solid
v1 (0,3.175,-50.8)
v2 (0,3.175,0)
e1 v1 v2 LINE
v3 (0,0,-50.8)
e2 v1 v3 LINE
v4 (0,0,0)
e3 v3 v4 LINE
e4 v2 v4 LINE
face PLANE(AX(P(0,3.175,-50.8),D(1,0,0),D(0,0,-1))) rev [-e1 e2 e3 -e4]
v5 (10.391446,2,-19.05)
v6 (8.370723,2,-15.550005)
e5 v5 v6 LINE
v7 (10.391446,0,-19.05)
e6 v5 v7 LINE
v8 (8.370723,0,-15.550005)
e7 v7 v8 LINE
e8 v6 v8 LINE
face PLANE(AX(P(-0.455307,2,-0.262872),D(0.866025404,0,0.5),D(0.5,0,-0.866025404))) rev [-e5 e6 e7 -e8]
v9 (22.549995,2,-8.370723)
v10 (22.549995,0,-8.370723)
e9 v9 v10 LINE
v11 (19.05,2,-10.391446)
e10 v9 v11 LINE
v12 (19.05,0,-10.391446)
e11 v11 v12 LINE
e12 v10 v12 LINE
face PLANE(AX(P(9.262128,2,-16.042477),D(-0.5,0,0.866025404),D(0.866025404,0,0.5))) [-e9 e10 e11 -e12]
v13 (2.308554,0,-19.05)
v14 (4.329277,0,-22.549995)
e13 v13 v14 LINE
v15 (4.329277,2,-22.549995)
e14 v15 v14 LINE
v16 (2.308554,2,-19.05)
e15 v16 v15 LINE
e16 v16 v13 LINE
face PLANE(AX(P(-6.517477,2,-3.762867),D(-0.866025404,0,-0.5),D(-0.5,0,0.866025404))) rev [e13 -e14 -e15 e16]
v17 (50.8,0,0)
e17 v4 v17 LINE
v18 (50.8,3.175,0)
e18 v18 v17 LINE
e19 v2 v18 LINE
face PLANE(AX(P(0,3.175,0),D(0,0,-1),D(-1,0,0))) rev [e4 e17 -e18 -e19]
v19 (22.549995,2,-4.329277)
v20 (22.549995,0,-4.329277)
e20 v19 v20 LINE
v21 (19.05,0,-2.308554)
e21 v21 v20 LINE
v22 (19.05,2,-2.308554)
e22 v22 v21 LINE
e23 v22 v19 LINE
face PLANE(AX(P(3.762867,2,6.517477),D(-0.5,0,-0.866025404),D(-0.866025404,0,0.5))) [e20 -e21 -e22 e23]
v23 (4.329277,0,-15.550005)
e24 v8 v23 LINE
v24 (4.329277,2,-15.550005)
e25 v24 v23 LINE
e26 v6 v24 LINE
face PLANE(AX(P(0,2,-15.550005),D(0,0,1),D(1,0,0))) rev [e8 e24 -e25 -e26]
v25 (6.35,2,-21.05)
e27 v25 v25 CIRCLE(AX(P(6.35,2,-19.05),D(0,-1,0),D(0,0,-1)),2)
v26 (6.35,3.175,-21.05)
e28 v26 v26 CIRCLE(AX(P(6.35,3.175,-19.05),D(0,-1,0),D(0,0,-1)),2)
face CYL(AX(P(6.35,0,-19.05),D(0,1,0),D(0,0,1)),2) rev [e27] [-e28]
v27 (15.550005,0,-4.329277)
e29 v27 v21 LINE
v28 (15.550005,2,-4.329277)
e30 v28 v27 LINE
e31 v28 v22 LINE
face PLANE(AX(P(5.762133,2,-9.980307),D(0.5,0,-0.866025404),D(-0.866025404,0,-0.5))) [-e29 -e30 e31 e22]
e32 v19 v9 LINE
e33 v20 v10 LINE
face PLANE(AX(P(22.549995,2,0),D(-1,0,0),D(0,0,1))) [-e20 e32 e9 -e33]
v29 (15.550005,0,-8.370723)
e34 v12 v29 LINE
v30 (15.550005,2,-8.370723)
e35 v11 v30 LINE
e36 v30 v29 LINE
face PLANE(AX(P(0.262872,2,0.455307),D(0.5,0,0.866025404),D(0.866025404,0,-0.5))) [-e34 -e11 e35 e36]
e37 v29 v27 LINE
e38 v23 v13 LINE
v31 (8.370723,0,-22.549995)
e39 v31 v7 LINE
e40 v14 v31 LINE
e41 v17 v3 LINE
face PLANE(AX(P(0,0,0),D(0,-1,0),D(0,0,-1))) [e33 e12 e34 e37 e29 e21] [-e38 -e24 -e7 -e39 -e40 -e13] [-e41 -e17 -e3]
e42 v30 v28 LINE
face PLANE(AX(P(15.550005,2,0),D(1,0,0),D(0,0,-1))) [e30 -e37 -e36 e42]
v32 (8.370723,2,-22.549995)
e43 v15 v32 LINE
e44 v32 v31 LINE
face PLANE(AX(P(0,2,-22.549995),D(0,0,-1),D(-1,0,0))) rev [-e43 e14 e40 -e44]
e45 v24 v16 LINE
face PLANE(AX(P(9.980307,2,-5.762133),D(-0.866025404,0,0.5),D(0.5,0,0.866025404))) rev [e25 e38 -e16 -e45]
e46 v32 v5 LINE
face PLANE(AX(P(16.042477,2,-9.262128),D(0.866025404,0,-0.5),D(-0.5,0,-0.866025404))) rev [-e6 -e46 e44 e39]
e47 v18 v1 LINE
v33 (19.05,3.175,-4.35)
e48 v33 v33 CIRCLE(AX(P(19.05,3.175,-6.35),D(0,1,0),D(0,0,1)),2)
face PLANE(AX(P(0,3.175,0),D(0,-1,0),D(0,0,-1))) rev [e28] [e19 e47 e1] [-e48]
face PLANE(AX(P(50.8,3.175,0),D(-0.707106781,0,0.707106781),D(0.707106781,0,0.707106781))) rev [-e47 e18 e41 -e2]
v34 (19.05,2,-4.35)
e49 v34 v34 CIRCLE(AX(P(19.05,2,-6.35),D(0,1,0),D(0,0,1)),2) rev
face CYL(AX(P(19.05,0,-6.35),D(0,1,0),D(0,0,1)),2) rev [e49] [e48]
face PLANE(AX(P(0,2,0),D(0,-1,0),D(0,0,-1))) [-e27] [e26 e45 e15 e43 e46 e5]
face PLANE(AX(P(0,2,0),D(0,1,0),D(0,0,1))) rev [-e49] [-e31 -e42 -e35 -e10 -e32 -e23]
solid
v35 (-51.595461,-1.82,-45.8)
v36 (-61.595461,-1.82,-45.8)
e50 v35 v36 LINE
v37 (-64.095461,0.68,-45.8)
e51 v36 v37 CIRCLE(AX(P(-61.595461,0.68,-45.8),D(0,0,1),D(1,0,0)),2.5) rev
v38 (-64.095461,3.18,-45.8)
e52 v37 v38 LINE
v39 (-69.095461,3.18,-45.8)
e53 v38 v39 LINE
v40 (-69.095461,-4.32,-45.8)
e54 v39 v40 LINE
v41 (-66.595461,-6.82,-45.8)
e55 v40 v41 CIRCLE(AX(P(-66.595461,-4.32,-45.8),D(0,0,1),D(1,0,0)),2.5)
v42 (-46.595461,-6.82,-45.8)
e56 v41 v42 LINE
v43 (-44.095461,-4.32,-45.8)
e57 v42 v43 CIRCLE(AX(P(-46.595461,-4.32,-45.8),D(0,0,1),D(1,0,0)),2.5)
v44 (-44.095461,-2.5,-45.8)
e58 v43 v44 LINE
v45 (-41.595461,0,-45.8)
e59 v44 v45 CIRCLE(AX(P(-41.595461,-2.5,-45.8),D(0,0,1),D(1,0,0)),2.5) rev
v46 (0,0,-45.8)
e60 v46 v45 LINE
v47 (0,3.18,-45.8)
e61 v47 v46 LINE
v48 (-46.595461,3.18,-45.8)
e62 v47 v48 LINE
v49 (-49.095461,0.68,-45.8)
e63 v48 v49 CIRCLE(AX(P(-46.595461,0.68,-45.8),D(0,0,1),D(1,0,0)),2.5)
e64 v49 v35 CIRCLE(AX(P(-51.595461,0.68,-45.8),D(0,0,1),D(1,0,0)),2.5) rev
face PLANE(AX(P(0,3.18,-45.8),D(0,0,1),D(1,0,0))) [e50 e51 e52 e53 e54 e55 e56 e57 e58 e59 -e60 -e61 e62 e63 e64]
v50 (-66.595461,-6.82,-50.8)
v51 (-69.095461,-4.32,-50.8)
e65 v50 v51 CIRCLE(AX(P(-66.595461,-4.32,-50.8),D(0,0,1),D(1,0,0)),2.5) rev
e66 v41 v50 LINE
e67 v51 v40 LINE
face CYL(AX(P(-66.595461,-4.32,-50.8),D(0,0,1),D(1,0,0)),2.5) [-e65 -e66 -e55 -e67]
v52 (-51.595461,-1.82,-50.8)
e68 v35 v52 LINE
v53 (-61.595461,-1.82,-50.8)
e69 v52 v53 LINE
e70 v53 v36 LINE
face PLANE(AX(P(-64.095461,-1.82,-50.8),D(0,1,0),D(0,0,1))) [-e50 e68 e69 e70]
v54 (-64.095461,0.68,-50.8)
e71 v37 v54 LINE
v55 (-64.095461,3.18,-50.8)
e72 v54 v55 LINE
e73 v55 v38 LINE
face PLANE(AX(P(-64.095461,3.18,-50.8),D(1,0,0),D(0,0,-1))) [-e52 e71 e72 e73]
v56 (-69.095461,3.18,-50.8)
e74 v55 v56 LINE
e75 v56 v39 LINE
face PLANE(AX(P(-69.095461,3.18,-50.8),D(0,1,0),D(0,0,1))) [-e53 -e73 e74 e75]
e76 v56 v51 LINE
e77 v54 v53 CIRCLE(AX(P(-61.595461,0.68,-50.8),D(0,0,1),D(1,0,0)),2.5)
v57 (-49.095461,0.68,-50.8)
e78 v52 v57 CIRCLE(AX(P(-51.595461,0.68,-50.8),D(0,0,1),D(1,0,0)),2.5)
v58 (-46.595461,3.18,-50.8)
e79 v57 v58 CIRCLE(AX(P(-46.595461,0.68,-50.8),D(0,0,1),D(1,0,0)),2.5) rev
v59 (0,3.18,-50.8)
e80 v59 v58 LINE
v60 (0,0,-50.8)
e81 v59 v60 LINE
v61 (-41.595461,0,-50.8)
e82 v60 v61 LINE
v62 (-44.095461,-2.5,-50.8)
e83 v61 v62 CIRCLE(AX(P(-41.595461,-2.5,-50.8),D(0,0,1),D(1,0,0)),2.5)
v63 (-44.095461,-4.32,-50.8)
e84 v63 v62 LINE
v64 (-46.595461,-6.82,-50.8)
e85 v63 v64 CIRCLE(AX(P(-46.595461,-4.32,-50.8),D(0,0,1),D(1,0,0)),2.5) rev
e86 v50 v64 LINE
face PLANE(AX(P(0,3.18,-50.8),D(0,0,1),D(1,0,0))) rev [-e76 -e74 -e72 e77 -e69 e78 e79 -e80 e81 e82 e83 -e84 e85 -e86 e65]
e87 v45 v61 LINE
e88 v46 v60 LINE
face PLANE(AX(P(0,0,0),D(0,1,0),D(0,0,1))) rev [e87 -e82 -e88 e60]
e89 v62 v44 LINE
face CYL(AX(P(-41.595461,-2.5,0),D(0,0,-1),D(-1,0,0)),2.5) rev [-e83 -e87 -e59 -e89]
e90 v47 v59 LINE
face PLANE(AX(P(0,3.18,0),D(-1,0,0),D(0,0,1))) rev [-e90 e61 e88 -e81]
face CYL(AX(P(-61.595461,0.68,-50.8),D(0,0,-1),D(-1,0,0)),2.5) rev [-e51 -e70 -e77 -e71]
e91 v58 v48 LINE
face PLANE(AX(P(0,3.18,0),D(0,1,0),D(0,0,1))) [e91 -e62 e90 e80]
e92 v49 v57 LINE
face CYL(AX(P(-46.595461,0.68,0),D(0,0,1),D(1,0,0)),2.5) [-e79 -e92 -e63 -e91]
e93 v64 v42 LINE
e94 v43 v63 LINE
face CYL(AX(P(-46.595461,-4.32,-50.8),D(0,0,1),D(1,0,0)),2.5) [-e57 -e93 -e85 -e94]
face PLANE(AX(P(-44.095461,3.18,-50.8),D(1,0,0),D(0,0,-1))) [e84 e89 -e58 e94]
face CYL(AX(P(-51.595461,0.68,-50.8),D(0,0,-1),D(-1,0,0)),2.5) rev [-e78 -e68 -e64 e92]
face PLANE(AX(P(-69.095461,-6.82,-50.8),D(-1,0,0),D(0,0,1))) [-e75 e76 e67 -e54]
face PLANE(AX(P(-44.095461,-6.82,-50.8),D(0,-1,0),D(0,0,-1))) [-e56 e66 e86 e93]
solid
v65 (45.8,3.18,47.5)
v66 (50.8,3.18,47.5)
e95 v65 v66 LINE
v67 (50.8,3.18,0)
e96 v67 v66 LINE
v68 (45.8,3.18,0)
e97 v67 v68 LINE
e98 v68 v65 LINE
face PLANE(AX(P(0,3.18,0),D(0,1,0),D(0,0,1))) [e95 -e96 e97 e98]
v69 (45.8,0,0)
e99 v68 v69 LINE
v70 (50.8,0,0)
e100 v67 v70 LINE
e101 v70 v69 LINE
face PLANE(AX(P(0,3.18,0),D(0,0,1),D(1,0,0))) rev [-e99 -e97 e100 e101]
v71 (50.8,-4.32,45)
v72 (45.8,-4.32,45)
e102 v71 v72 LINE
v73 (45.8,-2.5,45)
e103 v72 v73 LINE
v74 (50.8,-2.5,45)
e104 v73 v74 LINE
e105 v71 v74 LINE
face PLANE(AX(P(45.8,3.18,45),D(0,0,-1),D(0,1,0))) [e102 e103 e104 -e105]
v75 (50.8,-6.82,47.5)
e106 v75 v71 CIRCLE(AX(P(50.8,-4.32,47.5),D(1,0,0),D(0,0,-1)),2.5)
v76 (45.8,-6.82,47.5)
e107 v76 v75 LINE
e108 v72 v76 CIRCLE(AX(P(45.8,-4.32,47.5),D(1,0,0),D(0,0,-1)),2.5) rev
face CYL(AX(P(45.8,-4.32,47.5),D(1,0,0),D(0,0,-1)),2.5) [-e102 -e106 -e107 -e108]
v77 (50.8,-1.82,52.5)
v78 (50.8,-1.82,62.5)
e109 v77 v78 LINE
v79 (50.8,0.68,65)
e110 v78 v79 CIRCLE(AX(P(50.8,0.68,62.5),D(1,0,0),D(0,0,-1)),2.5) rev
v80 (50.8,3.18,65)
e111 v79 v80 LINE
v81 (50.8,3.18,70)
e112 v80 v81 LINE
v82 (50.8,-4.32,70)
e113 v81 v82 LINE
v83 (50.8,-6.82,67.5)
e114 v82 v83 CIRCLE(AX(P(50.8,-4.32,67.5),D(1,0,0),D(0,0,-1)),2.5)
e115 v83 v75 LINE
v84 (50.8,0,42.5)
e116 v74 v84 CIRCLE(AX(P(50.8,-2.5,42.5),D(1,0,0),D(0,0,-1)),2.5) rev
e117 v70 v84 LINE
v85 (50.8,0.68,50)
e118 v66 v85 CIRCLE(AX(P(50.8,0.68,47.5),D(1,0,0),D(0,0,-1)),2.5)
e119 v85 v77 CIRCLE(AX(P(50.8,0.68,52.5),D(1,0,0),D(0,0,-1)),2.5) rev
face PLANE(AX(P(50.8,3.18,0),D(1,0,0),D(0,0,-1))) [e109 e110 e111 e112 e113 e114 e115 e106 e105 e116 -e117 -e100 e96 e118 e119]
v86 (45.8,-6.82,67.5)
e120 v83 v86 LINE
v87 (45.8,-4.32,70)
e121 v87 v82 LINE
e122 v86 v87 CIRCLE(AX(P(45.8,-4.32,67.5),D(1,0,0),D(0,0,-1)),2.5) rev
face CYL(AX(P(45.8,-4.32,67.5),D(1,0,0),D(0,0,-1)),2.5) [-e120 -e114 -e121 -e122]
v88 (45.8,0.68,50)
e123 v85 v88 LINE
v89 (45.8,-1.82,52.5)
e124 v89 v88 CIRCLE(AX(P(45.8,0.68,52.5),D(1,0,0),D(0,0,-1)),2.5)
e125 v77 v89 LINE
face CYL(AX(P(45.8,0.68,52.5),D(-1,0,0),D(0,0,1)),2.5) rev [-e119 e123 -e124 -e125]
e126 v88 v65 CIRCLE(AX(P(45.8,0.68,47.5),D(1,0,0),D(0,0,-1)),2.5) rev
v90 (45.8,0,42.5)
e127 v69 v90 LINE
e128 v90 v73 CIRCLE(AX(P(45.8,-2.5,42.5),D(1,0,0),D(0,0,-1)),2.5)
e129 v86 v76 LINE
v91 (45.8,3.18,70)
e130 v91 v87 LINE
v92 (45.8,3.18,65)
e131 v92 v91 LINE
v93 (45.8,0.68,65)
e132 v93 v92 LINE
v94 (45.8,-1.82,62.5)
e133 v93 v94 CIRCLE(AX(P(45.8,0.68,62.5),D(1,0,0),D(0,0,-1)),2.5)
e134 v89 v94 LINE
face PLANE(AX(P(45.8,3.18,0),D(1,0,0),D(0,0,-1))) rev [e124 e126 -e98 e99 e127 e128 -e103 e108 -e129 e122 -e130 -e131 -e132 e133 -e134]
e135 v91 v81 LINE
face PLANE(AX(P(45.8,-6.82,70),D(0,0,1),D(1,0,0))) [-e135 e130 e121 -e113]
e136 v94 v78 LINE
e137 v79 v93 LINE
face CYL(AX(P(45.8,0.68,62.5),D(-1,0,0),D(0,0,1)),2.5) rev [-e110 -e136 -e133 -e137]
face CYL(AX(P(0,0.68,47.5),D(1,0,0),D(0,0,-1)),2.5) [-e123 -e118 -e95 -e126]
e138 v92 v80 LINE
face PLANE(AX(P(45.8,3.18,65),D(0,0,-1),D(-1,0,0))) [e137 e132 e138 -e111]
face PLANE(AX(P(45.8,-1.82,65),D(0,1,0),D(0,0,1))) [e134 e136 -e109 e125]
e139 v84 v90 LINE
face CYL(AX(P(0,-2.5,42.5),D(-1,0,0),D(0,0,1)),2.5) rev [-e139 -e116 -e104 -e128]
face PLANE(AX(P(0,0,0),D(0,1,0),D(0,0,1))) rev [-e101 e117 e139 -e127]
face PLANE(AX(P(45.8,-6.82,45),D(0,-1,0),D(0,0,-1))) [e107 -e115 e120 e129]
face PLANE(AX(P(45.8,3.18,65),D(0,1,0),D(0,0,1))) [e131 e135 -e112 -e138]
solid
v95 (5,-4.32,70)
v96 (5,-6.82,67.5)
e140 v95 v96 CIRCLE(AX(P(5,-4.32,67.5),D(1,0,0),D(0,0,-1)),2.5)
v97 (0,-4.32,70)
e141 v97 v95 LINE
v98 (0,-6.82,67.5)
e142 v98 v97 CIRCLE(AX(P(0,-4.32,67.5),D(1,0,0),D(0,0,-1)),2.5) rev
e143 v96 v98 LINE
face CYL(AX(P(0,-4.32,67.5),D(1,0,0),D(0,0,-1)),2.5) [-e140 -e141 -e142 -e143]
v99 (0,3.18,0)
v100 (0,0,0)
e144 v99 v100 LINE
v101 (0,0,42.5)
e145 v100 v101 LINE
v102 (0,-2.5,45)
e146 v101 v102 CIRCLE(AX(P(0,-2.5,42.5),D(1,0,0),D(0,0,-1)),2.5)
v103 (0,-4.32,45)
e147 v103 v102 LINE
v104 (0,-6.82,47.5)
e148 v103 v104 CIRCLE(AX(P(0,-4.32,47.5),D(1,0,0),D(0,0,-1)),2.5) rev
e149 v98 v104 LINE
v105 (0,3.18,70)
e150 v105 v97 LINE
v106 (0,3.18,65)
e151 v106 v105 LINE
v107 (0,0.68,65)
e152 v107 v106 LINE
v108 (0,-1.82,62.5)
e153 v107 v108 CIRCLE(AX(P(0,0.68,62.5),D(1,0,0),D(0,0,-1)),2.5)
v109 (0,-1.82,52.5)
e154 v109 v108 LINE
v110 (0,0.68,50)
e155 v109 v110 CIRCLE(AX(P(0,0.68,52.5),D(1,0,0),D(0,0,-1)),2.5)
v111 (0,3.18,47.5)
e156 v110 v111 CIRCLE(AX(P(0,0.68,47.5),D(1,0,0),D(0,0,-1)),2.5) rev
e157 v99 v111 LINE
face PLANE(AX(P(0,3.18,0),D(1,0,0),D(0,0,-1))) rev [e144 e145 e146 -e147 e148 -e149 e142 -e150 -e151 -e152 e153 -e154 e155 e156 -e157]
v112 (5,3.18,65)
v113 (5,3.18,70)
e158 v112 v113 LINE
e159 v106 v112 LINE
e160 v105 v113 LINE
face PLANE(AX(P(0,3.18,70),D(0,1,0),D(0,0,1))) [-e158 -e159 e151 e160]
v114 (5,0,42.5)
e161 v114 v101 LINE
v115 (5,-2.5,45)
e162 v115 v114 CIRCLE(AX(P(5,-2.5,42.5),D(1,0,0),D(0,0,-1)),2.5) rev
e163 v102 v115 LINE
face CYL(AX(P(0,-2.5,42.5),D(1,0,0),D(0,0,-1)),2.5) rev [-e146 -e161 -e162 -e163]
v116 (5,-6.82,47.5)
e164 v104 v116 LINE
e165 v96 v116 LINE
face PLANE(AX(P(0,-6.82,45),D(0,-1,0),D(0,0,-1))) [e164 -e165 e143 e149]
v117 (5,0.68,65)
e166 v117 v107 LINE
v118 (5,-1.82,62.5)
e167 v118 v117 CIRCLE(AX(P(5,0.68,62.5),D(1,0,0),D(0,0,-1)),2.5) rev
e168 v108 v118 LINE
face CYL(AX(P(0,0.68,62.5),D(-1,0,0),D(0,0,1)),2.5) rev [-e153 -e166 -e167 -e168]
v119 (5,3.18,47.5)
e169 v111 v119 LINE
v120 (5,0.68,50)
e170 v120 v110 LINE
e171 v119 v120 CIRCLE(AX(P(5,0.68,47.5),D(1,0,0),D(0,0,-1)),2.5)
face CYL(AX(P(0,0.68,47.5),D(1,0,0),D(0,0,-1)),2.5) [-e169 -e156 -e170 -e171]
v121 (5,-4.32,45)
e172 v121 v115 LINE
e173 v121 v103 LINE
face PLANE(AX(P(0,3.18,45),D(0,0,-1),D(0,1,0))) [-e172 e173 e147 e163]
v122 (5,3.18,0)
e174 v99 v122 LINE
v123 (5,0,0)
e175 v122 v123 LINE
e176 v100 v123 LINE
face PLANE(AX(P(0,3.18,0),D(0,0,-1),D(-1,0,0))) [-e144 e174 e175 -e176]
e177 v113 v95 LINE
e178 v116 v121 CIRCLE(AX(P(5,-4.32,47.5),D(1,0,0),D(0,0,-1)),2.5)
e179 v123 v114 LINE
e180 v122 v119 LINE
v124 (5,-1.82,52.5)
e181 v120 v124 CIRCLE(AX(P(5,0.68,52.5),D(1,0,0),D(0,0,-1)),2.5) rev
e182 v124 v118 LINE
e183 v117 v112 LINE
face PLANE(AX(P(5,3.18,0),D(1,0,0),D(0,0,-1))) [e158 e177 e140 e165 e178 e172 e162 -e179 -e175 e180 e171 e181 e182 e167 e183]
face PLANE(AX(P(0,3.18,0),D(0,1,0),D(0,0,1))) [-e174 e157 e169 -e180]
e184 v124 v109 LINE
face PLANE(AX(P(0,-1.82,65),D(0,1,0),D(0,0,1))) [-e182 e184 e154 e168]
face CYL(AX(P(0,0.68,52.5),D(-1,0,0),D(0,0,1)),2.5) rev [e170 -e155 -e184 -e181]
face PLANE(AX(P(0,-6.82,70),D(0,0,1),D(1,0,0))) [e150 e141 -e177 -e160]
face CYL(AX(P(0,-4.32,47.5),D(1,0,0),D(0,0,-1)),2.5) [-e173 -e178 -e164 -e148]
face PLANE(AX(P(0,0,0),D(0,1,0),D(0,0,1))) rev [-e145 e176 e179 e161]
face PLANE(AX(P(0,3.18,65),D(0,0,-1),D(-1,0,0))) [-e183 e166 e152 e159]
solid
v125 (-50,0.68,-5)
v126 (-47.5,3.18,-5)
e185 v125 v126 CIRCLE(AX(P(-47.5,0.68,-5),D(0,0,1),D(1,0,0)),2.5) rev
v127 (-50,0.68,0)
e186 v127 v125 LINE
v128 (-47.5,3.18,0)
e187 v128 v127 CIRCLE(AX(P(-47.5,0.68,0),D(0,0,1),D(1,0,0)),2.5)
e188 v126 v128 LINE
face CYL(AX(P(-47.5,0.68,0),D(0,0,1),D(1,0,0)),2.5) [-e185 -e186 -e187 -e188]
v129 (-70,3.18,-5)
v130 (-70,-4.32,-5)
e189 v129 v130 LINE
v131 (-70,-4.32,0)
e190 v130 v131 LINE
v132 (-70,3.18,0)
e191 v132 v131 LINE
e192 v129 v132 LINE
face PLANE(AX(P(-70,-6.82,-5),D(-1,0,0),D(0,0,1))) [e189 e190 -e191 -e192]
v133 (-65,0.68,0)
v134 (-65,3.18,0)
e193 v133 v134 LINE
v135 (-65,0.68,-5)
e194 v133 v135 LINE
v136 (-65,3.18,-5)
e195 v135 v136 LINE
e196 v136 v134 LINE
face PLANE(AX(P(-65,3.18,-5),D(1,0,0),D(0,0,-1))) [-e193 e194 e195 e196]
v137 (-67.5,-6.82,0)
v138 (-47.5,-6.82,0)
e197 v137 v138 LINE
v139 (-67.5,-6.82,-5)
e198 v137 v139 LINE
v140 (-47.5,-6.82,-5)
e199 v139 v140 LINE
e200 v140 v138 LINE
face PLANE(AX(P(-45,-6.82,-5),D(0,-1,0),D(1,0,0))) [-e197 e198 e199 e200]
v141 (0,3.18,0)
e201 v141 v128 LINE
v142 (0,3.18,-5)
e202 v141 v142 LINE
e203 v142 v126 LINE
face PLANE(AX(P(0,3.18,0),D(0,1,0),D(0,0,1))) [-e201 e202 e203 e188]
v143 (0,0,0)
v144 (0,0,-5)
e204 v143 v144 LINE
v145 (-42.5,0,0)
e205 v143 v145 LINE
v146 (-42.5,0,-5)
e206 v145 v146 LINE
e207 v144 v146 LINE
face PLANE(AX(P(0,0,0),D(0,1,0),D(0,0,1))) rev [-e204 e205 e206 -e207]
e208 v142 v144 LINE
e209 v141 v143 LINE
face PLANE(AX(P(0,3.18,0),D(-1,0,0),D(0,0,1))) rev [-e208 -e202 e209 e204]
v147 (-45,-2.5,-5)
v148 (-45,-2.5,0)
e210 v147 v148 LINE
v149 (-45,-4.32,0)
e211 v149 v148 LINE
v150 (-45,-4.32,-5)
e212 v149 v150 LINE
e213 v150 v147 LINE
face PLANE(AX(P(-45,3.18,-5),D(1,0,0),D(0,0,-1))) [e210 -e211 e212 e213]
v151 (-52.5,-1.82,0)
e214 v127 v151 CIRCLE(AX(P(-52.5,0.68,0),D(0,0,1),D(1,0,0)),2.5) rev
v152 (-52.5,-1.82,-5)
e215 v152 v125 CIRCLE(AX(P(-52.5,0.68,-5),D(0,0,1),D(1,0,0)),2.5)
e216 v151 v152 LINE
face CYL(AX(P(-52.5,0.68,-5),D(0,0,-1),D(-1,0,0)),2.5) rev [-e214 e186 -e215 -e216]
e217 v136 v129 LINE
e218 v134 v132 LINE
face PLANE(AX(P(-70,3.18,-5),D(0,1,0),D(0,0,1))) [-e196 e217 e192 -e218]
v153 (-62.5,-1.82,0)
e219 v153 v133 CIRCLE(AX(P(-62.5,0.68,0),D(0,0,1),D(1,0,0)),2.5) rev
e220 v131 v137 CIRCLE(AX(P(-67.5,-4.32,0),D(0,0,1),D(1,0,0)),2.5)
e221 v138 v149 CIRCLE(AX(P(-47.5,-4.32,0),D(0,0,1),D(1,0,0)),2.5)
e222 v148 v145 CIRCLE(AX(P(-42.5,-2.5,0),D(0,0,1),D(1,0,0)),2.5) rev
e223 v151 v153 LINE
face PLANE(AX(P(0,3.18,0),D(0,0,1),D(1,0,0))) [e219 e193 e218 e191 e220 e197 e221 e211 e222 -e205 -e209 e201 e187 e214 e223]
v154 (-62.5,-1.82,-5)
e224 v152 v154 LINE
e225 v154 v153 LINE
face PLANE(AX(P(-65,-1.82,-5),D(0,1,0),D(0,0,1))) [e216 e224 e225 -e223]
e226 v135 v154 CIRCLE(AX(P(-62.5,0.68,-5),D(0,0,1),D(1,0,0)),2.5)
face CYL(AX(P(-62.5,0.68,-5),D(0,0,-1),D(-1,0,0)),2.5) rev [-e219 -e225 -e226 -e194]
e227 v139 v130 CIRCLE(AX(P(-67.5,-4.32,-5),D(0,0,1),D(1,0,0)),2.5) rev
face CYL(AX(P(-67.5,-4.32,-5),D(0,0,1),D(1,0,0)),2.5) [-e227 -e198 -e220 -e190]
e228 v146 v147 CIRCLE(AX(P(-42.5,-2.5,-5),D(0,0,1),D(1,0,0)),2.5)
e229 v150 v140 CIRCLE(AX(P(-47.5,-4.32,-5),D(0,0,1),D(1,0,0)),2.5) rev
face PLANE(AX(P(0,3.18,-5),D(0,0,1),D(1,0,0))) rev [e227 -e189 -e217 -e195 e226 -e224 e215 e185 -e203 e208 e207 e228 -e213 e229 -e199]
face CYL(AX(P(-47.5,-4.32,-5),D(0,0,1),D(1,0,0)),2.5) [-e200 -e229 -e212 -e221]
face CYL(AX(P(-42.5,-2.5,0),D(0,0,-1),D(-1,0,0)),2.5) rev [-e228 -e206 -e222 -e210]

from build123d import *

# Parameters (mm, degrees)
BOSS_EXTRUDE1_DEPTH   = 3.175
SKETCH2_R             = 2
CUT_EXTRUDE1_DEPTH    = 72.912172996
CUT_EXTRUDE2_START    = -3.175
CUT_EXTRUDE2_DEPTH    = 2
SKETCH5_W             = 5
SKETCH5_H             = 45
BOSS_EXTRUDE6_DEPTH   = 3.18
BOSS_EXTRUDE6_2_DEPTH = 3.18
SKETCH5_W_2           = 45
SKETCH5_H_2           = 5
BOSS_EXTRUDE6_3_DEPTH = 3.18
SKETCH5_W_3           = 44.095460655
BOSS_EXTRUDE6_4_DEPTH = 3.18
BOSS_EXTRUDE7_DEPTH   = 5
FILLET1_START         = 45
FILLET1_DEPTH         = 7
FILLET1_START_2       = 45.8
FILLET1_2_DEPTH       = 5
BOSS_EXTRUDE8_DEPTH   = 5
FILLET2_START         = -1
FILLET2_DEPTH         = 7
FILLET2_2_DEPTH       = 5
BOSS_EXTRUDE9_DEPTH   = 5
FILLET3_START         = -6
FILLET3_DEPTH         = 7
FILLET3_START_2       = -5
FILLET3_2_DEPTH       = 5
BOSS_EXTRUDE10_DEPTH  = 5
FILLET4_START         = -52
FILLET4_DEPTH         = 7
FILLET4_START_2       = -50.8
FILLET4_2_DEPTH       = 5


with BuildPart() as part:
    # Sketch1 → Boss-Extrude1 (new body)
    with BuildSketch(Plane(origin=(0, 0, 0), x_dir=(1, 0, 0), z_dir=(0, 1, 0))):
        Polygon((0, 0), (50.8, 0), (0, 50.8), align=None)
    extrude(amount=BOSS_EXTRUDE1_DEPTH)

    # Sketch2 → Cut-Extrude1 (cut, through all)
    with BuildSketch(Plane(origin=(0, 3.175, 0), x_dir=(1, 0, 0), z_dir=(0, 1, 0))):
        with Locations(Location((19.05, 6.35, 0), (0, 0, 270))):
            Circle(SKETCH2_R)
        with Locations(Location((6.35, 19.05, 0), (0, 0, 90))):
            Circle(SKETCH2_R)
    extrude(amount=-CUT_EXTRUDE1_DEPTH, mode=Mode.SUBTRACT)

    # Sketch3 → Cut-Extrude2 (cut)
    with BuildSketch(Plane(origin=(0, 3.175, 0), x_dir=(1, 0, 0), z_dir=(0, 1, 0)).offset(CUT_EXTRUDE2_START)):
        Polygon((8.370723055, 15.550005), (10.391446111, 19.05), (8.370723055, 22.549995), (4.329276945, 22.549995), (2.308553889, 19.05), (4.329276945, 15.550005), align=None)
        Polygon((22.549995, 4.329276945), (19.05, 2.308553889), (15.550005, 4.329276945), (15.550005, 8.370723055), (19.05, 10.391446111), (22.549995, 8.370723055), align=None)
    extrude(amount=CUT_EXTRUDE2_DEPTH, mode=Mode.SUBTRACT)


with BuildPart() as body_2:
    # Sketch5 → Boss-Extrude6 (new body)
    with BuildSketch(Plane(origin=(0, 0, 0), x_dir=(1, 0, 0), z_dir=(0, 1, 0))):
        with Locations((48.3, -22.5)):
            Rectangle(SKETCH5_W, SKETCH5_H)
    extrude(amount=BOSS_EXTRUDE6_DEPTH)

    # Sketch7 → Boss-Extrude7 (add)
    with BuildSketch(Plane(origin=(50.8, 0, 0), x_dir=(0, 0, -1), z_dir=(1, 0, 0))):
        Polygon((-45, 3.18), (-50, 3.18), (-50, -1.82), (-65, -1.82), (-65, 3.18), (-70, 3.18), (-70, -6.82), (-45, -6.82), align=None)
    extrude(amount=-BOSS_EXTRUDE7_DEPTH)

    # Fillet1: read off the stored shape, not the designer's step
    # Fillet1 outline → Fillet1 (cut)
    with BuildSketch(Plane.YZ.offset(FILLET1_START)):
        with BuildLine():
            ThreePointArc((-4.32, 45), (-6.087766953, 45.732233047), (-6.82, 47.5))
            Line((-6.82, 47.5), (-6.82, 45))
            Line((-6.82, 45), (-4.32, 45))
        make_face()
        with BuildLine():
            Line((3.18, 50), (0.68, 50))
            ThreePointArc((0.68, 50), (2.447766953, 49.267766953), (3.18, 47.5))
            Line((3.18, 47.5), (3.18, 50))
        make_face()
        with BuildLine():
            ThreePointArc((-6.82, 67.5), (-6.087766953, 69.267766953), (-4.32, 70))
            Line((-4.32, 70), (-6.82, 70))
            Line((-6.82, 70), (-6.82, 67.5))
        make_face()
    extrude(amount=FILLET1_DEPTH, mode=Mode.SUBTRACT)

    # Fillet1 2 outline → Fillet1 2 (add)
    with BuildSketch(Plane.YZ.offset(FILLET1_START_2)):
        with BuildLine():
            Line((0, 45), (-2.5, 45))
            ThreePointArc((-2.5, 45), (-0.732233047, 44.267766953), (0, 42.5))
            Line((0, 42.5), (0, 45))
        make_face()
        with BuildLine():
            ThreePointArc((0.68, 50), (-1.087766953, 50.732233047), (-1.82, 52.5))
            Line((-1.82, 52.5), (-1.82, 50))
            Line((-1.82, 50), (0.68, 50))
        make_face()
        with BuildLine():
            ThreePointArc((-1.82, 62.5), (-1.087766953, 64.267766953), (0.68, 65))
            Line((0.68, 65), (-1.82, 65))
            Line((-1.82, 65), (-1.82, 62.5))
        make_face()
    extrude(amount=FILLET1_2_DEPTH)


with BuildPart() as body_3:
    # Sketch5 → Boss-Extrude6 2 (new body)
    with BuildSketch(Plane(origin=(0, 0, 0), x_dir=(1, 0, 0), z_dir=(0, 1, 0))):
        with Locations((2.5, -22.5)):
            Rectangle(SKETCH5_W, SKETCH5_H)
    extrude(amount=BOSS_EXTRUDE6_2_DEPTH)

    # Sketch9 → Boss-Extrude8 (add)
    with BuildSketch(Plane(origin=(5, 0, 0), x_dir=(0, 0, -1), z_dir=(1, 0, 0))):
        Polygon((-45, 3.18), (-45, -6.82), (-70, -6.82), (-70, 3.18), (-65, 3.18), (-65, -1.82), (-50, -1.82), (-50, 3.18), align=None)
    extrude(amount=-BOSS_EXTRUDE8_DEPTH)

    # Fillet2: read off the stored shape, not the designer's step
    # Fillet2 outline → Fillet2 (cut)
    with BuildSketch(Plane.YZ.offset(FILLET2_START)):
        with BuildLine():
            Line((3.18, 50), (0.68, 50))
            ThreePointArc((0.68, 50), (2.447766953, 49.267766953), (3.18, 47.5))
            Line((3.18, 47.5), (3.18, 50))
        make_face()
        with BuildLine():
            ThreePointArc((-4.32, 45), (-6.087766953, 45.732233047), (-6.82, 47.5))
            Line((-6.82, 47.5), (-6.82, 45))
            Line((-6.82, 45), (-4.32, 45))
        make_face()
        with BuildLine():
            ThreePointArc((-6.82, 67.5), (-6.087766953, 69.267766953), (-4.32, 70))
            Line((-4.32, 70), (-6.82, 70))
            Line((-6.82, 70), (-6.82, 67.5))
        make_face()
    extrude(amount=FILLET2_DEPTH, mode=Mode.SUBTRACT)

    # Fillet2 2 outline → Fillet2 2 (add)
    with BuildSketch(Plane.YZ):
        with BuildLine():
            Line((-1.82, 65), (-1.82, 62.5))
            ThreePointArc((-1.82, 62.5), (-1.087766953, 64.267766953), (0.68, 65))
            Line((0.68, 65), (-1.82, 65))
        make_face()
        with BuildLine():
            ThreePointArc((0.68, 50), (-1.087766953, 50.732233047), (-1.82, 52.5))
            Line((-1.82, 52.5), (-1.82, 50))
            Line((-1.82, 50), (0.68, 50))
        make_face()
        with BuildLine():
            Line((0, 45), (-2.5, 45))
            ThreePointArc((-2.5, 45), (-0.732233047, 44.267766953), (0, 42.5))
            Line((0, 42.5), (0, 45))
        make_face()
    extrude(amount=FILLET2_2_DEPTH)


with BuildPart() as body_4:
    # Sketch5 → Boss-Extrude6 3 (new body)
    with BuildSketch(Plane(origin=(0, 0, 0), x_dir=(1, 0, 0), z_dir=(0, 1, 0))):
        with Locations((-22.5, 2.5)):
            Rectangle(SKETCH5_W_2, SKETCH5_H_2)
    extrude(amount=BOSS_EXTRUDE6_3_DEPTH)

    # Sketch10 → Boss-Extrude9 (add)
    with BuildSketch(Plane.XY):
        Polygon((-45, 3.18), (-45, -6.82), (-70, -6.82), (-70, 3.18), (-65, 3.18), (-65, -1.82), (-50, -1.82), (-50, 3.18), align=None)
    extrude(amount=-BOSS_EXTRUDE9_DEPTH)

    # Fillet3: read off the stored shape, not the designer's step
    # Fillet3 outline → Fillet3 (cut)
    with BuildSketch(Plane.XY.offset(FILLET3_START)):
        with BuildLine():
            Line((-50, 3.18), (-50, 0.68))
            ThreePointArc((-50, 0.68), (-49.267766953, 2.447766953), (-47.5, 3.18))
            Line((-47.5, 3.18), (-50, 3.18))
        make_face()
        with BuildLine():
            ThreePointArc((-45, -4.32), (-45.732233047, -6.087766953), (-47.5, -6.82))
            Line((-47.5, -6.82), (-45, -6.82))
            Line((-45, -6.82), (-45, -4.32))
        make_face()
        with BuildLine():
            ThreePointArc((-67.5, -6.82), (-69.267766953, -6.087766953), (-70, -4.32))
            Line((-70, -4.32), (-70, -6.82))
            Line((-70, -6.82), (-67.5, -6.82))
        make_face()
    extrude(amount=FILLET3_DEPTH, mode=Mode.SUBTRACT)

    # Fillet3 2 outline → Fillet3 2 (add)
    with BuildSketch(Plane.XY.offset(FILLET3_START_2)):
        with BuildLine():
            Line((-65, -1.82), (-62.5, -1.82))
            ThreePointArc((-62.5, -1.82), (-64.267766953, -1.087766953), (-65, 0.68))
            Line((-65, 0.68), (-65, -1.82))
        make_face()
        with BuildLine():
            ThreePointArc((-50, 0.68), (-50.732233047, -1.087766953), (-52.5, -1.82))
            Line((-52.5, -1.82), (-50, -1.82))
            Line((-50, -1.82), (-50, 0.68))
        make_face()
        with BuildLine():
            Line((-45, 0), (-45, -2.5))
            ThreePointArc((-45, -2.5), (-44.267766953, -0.732233047), (-42.5, 0))
            Line((-42.5, 0), (-45, 0))
        make_face()
    extrude(amount=FILLET3_2_DEPTH)


with BuildPart() as body_5:
    # Sketch5 → Boss-Extrude6 4 (new body)
    with BuildSketch(Plane(origin=(0, 0, 0), x_dir=(1, 0, 0), z_dir=(0, 1, 0))):
        with Locations((-22.047730328, 48.3)):
            Rectangle(SKETCH5_W_3, SKETCH5_H_2)
    extrude(amount=BOSS_EXTRUDE6_4_DEPTH)

    # Sketch12 → Boss-Extrude10 (add)
    with BuildSketch(Plane.XY.offset(-45.8)):
        Polygon((-44.095460655, 3.18), (-44.095460655, -6.82), (-69.095460655, -6.82), (-69.095460655, 3.18), (-64.095460655, 3.18), (-64.095460655, -1.82), (-49.095460655, -1.82), (-49.095460655, 3.18), align=None)
    extrude(amount=-BOSS_EXTRUDE10_DEPTH)

    # Fillet4: read off the stored shape, not the designer's step
    # Fillet4 outline → Fillet4 (cut)
    with BuildSketch(Plane.XY.offset(FILLET4_START)):
        with BuildLine():
            Line((-49.095460655, 3.18), (-49.095460655, 0.68))
            ThreePointArc((-49.095460655, 0.68), (-48.363227608, 2.447766953), (-46.595460655, 3.18))
            Line((-46.595460655, 3.18), (-49.095460655, 3.18))
        make_face()
        with BuildLine():
            ThreePointArc((-44.095460655, -4.32), (-44.827693702, -6.087766953), (-46.595460655, -6.82))
            Line((-46.595460655, -6.82), (-44.095460655, -6.82))
            Line((-44.095460655, -6.82), (-44.095460655, -4.32))
        make_face()
        with BuildLine():
            ThreePointArc((-66.595460655, -6.82), (-68.363227608, -6.087766953), (-69.095460655, -4.32))
            Line((-69.095460655, -4.32), (-69.095460655, -6.82))
            Line((-69.095460655, -6.82), (-66.595460655, -6.82))
        make_face()
    extrude(amount=FILLET4_DEPTH, mode=Mode.SUBTRACT)

    # Fillet4 2 outline → Fillet4 2 (add)
    with BuildSketch(Plane.XY.offset(FILLET4_START_2)):
        with BuildLine():
            Line((-64.095460655, -1.82), (-61.595460655, -1.82))
            ThreePointArc((-61.595460655, -1.82), (-63.363227608, -1.087766953), (-64.095460655, 0.68))
            Line((-64.095460655, 0.68), (-64.095460655, -1.82))
        make_face()
        with BuildLine():
            ThreePointArc((-49.095460655, 0.68), (-49.827693702, -1.087766953), (-51.595460655, -1.82))
            Line((-51.595460655, -1.82), (-49.095460655, -1.82))
            Line((-49.095460655, -1.82), (-49.095460655, 0.68))
        make_face()
        with BuildLine():
            Line((-44.095460655, 0), (-44.095460655, -2.5))
            ThreePointArc((-44.095460655, -2.5), (-43.363227608, -0.732233047), (-41.595460655, 0))
            Line((-41.595460655, 0), (-44.095460655, 0))
        make_face()
    extrude(amount=FILLET4_2_DEPTH)


solid = Compound([part.part, body_2.part, body_3.part, body_4.part, body_5.part])
